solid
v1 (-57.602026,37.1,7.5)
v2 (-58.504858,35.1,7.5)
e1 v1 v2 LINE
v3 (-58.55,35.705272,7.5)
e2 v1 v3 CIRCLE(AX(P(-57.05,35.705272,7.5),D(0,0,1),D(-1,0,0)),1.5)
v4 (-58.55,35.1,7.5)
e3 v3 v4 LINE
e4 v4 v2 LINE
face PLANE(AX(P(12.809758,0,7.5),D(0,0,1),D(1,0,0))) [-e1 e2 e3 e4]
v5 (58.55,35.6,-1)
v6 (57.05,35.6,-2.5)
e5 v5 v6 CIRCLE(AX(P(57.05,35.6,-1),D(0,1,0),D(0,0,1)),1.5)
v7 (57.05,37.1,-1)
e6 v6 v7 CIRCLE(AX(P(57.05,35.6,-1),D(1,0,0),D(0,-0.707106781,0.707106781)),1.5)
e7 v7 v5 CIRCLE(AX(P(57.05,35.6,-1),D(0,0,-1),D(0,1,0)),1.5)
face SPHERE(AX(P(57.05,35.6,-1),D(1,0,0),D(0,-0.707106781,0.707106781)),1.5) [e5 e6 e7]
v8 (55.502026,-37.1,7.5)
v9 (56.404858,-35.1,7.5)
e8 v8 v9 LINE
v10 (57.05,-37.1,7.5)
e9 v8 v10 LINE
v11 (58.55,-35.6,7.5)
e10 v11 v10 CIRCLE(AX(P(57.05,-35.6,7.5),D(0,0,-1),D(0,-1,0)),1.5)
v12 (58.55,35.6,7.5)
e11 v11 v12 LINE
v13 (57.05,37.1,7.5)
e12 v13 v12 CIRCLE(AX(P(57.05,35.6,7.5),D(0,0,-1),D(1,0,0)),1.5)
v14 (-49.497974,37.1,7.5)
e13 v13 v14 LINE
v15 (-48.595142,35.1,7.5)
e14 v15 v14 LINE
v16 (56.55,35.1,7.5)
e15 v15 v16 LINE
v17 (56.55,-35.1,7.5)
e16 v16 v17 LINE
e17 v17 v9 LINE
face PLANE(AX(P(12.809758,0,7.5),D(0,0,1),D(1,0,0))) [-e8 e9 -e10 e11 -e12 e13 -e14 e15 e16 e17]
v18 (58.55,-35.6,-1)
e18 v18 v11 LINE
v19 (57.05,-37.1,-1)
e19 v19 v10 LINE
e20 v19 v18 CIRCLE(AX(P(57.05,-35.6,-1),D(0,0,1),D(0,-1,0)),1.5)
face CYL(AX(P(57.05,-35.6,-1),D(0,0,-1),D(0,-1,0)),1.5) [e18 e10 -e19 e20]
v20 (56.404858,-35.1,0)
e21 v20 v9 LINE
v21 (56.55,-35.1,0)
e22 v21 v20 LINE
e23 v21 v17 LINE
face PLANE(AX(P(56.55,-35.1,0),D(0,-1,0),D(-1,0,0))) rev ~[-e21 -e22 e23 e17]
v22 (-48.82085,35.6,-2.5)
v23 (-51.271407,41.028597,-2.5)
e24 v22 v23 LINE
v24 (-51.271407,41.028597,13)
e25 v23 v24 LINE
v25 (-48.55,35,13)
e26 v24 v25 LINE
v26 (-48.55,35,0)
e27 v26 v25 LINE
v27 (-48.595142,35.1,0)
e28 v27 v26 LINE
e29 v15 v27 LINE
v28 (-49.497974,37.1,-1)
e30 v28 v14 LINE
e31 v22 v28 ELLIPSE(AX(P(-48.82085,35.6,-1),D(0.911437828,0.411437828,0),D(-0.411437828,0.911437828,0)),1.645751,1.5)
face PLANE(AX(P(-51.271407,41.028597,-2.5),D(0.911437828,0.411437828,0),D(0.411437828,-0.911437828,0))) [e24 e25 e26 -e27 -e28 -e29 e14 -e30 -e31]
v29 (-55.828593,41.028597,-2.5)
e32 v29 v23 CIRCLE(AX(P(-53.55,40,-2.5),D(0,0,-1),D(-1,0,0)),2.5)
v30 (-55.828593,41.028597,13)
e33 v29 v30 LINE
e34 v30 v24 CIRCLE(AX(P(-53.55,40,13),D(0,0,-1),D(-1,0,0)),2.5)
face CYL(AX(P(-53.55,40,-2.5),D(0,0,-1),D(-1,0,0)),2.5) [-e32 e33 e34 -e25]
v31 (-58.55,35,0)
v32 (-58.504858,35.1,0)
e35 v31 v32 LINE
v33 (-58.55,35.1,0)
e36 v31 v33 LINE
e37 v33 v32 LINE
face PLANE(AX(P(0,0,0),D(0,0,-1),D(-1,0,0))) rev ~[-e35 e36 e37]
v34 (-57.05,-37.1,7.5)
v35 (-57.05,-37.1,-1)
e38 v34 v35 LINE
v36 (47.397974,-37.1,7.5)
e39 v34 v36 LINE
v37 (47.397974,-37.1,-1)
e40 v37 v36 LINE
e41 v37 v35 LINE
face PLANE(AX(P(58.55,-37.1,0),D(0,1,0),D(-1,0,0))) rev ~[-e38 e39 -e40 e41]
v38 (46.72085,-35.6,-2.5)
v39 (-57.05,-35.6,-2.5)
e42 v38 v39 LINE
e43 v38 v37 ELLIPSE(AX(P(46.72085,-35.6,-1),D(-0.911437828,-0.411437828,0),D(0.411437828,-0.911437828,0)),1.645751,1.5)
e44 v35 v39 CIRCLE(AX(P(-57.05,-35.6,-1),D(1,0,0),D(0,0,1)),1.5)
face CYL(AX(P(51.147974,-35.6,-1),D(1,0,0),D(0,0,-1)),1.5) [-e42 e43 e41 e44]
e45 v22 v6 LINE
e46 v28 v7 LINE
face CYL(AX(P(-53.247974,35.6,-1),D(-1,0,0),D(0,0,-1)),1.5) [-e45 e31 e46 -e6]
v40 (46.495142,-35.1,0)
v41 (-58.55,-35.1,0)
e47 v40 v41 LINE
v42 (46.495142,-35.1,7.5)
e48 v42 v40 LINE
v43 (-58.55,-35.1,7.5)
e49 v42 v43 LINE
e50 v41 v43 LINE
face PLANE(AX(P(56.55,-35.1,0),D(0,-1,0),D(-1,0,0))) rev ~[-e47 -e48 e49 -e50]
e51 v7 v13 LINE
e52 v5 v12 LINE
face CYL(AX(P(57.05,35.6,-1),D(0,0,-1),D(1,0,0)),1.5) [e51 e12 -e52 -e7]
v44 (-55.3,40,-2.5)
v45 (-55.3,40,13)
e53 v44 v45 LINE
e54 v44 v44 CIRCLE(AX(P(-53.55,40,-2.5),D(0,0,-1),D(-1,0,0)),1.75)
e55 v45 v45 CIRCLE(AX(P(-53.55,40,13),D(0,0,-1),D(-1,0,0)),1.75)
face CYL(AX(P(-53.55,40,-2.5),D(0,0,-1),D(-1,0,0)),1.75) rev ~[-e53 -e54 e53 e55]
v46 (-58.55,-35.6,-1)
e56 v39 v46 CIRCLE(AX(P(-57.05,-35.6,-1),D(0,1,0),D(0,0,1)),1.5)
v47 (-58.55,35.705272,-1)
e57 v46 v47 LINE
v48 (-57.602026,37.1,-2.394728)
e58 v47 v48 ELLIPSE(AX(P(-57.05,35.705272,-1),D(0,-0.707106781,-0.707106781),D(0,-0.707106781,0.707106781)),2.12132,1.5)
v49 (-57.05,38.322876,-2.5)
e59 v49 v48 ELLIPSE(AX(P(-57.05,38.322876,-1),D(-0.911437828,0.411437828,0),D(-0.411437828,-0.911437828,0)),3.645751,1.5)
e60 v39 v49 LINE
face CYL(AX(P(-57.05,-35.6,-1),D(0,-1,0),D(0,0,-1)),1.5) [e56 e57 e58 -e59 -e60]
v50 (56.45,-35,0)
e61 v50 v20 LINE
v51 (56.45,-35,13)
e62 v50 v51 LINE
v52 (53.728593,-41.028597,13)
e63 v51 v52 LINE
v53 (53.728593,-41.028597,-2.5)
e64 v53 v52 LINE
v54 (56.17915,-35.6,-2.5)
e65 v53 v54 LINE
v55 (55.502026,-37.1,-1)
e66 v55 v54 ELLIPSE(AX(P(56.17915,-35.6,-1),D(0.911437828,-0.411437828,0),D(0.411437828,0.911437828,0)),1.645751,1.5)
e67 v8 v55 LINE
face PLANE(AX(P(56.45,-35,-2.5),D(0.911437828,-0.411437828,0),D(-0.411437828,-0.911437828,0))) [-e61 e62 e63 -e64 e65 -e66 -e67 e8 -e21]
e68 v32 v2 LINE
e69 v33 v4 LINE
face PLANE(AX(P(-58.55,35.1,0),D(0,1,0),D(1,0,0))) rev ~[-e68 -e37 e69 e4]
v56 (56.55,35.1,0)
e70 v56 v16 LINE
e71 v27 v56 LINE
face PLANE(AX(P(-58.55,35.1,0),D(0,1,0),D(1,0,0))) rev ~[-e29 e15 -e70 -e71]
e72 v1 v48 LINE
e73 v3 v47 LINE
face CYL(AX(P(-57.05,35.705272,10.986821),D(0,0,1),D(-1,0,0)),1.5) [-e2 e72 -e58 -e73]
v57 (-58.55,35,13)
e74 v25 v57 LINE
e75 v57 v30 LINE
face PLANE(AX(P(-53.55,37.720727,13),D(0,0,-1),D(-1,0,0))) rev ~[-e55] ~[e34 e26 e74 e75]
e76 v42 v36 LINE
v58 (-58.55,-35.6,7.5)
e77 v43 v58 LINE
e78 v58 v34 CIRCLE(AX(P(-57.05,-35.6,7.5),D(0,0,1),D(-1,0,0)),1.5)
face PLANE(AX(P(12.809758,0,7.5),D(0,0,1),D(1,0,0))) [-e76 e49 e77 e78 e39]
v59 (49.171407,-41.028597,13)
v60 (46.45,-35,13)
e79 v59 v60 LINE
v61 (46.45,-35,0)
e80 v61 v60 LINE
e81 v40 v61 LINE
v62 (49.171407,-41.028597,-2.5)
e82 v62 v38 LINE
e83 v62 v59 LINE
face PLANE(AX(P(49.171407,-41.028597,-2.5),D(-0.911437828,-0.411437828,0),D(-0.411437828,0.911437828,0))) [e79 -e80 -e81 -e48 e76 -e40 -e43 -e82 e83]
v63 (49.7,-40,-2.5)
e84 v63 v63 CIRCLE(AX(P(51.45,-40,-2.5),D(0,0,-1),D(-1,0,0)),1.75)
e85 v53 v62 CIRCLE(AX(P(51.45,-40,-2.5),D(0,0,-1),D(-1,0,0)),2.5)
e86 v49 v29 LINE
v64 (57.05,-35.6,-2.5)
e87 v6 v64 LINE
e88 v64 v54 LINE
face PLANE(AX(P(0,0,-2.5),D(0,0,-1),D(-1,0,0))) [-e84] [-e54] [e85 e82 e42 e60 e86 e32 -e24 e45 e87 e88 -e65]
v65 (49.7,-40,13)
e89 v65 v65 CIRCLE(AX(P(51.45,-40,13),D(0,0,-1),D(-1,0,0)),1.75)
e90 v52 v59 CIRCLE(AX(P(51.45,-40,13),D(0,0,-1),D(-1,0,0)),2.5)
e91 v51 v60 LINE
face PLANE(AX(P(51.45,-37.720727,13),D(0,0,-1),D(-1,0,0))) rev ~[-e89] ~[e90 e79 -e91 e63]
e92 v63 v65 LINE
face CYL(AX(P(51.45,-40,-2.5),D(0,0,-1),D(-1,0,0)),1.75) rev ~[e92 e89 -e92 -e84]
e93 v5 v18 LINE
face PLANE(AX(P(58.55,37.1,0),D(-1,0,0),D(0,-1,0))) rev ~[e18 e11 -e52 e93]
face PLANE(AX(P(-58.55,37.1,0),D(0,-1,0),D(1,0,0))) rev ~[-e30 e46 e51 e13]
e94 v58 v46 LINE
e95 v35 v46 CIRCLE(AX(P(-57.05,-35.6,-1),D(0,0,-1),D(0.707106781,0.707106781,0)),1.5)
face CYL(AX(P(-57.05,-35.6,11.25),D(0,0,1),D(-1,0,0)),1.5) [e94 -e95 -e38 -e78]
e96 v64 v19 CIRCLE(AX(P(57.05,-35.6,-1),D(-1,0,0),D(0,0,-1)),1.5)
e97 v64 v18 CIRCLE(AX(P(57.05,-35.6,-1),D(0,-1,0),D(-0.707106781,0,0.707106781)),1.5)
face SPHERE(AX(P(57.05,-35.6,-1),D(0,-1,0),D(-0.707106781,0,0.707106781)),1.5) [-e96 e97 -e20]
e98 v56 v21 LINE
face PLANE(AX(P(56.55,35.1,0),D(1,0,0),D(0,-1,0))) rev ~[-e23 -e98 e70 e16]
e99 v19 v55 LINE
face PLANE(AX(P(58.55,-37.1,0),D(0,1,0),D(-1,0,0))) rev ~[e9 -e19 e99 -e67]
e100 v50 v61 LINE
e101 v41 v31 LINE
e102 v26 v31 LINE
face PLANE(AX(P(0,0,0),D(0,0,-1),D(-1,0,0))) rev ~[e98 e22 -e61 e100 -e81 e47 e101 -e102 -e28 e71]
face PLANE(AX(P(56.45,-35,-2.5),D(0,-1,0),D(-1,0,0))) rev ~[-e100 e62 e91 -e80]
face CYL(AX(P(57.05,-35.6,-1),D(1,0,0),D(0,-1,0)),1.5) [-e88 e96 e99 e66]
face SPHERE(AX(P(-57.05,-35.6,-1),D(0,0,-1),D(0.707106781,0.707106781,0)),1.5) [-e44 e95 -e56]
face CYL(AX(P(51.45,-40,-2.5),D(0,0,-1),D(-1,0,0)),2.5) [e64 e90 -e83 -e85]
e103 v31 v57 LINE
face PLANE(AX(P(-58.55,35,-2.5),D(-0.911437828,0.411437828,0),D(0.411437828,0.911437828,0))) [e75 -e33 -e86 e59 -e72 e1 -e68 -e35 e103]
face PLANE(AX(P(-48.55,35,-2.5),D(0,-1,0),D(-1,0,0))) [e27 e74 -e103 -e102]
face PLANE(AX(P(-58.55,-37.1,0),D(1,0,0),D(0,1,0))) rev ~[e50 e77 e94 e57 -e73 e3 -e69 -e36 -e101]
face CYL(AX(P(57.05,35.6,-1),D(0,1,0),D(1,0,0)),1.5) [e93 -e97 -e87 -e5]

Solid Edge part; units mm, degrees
sketch "Sketch1" plane through (0, 0, 0) normal (0, 0, 1) x (1, 0, 0)
  line L0 (58.55, -37.1) -> (-58.55, -37.1)
  line L1 (-58.55, -37.1) -> (-58.55, 37.1)
  line L2 (-58.55, 37.1) -> (58.55, 37.1)
  line L3 (58.55, 37.1) -> (58.55, -37.1)
extrude "Protrusion1" add sketch "Sketch1" against normal blind 2.5
sketch "Sketch2" plane through (0, 0, 0) normal (0, 0, 1) x (1, 0, 0)
  line L0 (56.55, -35.1) -> (-58.55, -35.1)
  line L1 (-58.55, -35.1) -> (-58.55, -37.1)
  line L2 (-58.55, -37.1) -> (58.55, -37.1)
  line L3 (58.55, -37.1) -> (58.55, 37.1)
  line L4 (58.55, 37.1) -> (-58.55, 37.1)
  line L5 (-58.55, 37.1) -> (-58.55, 35.1)
  line L6 (-58.55, 35.1) -> (56.55, 35.1)
  line L7 (56.55, 35.1) -> (56.55, -35.1)
extrude "ExtrudedProtrusion_2" add sketch "Sketch2" along normal blind 7.5
sketch "Sketch3" plane through (0, 0, -2.5) normal (0, 0, -1) x (-1, 0, 0)
  line L0 (-49.1714, -41.0286) -> (-46.45, -35)
  line L1 (-56.45, -35) -> (-46.45, -35)
  line L2 (-56.45, -35) -> (-53.7286, -41.0286)
  arc A0 (-53.7286, -41.0286) -> (-49.1714, -41.0286) centre (-51.45, -40) ccw
  circle A1 centre (-51.45, -40) radius 1.75
  circle A2 centre (53.55, 40) radius 1.75
  line L3 (58.55, 35) -> (55.8286, 41.0286)
  arc A3 (55.8286, 41.0286) -> (51.2714, 41.0286) centre (53.55, 40) ccw
  line L4 (51.2714, 41.0286) -> (48.55, 35)
  line L5 (48.55, 35) -> (58.55, 35)
extrude "Protrusion2" add sketch "Sketch3" against normal up to vertex (15.5 mm away)
fillet "Round_1" radius 1.5 9 edges at (58.55, -37.1, 2.5) (58.55, 37.1, 2.5) (58.55, 0, -2.5) (4.526, 37.1, -2.5) (-5.576, -37.1, -2.5) (57.026, -37.1, -2.5) (-58.55, 0, -2.5) (-58.55, 37.1, 2.5) (-58.55, -37.1, 2.5)
